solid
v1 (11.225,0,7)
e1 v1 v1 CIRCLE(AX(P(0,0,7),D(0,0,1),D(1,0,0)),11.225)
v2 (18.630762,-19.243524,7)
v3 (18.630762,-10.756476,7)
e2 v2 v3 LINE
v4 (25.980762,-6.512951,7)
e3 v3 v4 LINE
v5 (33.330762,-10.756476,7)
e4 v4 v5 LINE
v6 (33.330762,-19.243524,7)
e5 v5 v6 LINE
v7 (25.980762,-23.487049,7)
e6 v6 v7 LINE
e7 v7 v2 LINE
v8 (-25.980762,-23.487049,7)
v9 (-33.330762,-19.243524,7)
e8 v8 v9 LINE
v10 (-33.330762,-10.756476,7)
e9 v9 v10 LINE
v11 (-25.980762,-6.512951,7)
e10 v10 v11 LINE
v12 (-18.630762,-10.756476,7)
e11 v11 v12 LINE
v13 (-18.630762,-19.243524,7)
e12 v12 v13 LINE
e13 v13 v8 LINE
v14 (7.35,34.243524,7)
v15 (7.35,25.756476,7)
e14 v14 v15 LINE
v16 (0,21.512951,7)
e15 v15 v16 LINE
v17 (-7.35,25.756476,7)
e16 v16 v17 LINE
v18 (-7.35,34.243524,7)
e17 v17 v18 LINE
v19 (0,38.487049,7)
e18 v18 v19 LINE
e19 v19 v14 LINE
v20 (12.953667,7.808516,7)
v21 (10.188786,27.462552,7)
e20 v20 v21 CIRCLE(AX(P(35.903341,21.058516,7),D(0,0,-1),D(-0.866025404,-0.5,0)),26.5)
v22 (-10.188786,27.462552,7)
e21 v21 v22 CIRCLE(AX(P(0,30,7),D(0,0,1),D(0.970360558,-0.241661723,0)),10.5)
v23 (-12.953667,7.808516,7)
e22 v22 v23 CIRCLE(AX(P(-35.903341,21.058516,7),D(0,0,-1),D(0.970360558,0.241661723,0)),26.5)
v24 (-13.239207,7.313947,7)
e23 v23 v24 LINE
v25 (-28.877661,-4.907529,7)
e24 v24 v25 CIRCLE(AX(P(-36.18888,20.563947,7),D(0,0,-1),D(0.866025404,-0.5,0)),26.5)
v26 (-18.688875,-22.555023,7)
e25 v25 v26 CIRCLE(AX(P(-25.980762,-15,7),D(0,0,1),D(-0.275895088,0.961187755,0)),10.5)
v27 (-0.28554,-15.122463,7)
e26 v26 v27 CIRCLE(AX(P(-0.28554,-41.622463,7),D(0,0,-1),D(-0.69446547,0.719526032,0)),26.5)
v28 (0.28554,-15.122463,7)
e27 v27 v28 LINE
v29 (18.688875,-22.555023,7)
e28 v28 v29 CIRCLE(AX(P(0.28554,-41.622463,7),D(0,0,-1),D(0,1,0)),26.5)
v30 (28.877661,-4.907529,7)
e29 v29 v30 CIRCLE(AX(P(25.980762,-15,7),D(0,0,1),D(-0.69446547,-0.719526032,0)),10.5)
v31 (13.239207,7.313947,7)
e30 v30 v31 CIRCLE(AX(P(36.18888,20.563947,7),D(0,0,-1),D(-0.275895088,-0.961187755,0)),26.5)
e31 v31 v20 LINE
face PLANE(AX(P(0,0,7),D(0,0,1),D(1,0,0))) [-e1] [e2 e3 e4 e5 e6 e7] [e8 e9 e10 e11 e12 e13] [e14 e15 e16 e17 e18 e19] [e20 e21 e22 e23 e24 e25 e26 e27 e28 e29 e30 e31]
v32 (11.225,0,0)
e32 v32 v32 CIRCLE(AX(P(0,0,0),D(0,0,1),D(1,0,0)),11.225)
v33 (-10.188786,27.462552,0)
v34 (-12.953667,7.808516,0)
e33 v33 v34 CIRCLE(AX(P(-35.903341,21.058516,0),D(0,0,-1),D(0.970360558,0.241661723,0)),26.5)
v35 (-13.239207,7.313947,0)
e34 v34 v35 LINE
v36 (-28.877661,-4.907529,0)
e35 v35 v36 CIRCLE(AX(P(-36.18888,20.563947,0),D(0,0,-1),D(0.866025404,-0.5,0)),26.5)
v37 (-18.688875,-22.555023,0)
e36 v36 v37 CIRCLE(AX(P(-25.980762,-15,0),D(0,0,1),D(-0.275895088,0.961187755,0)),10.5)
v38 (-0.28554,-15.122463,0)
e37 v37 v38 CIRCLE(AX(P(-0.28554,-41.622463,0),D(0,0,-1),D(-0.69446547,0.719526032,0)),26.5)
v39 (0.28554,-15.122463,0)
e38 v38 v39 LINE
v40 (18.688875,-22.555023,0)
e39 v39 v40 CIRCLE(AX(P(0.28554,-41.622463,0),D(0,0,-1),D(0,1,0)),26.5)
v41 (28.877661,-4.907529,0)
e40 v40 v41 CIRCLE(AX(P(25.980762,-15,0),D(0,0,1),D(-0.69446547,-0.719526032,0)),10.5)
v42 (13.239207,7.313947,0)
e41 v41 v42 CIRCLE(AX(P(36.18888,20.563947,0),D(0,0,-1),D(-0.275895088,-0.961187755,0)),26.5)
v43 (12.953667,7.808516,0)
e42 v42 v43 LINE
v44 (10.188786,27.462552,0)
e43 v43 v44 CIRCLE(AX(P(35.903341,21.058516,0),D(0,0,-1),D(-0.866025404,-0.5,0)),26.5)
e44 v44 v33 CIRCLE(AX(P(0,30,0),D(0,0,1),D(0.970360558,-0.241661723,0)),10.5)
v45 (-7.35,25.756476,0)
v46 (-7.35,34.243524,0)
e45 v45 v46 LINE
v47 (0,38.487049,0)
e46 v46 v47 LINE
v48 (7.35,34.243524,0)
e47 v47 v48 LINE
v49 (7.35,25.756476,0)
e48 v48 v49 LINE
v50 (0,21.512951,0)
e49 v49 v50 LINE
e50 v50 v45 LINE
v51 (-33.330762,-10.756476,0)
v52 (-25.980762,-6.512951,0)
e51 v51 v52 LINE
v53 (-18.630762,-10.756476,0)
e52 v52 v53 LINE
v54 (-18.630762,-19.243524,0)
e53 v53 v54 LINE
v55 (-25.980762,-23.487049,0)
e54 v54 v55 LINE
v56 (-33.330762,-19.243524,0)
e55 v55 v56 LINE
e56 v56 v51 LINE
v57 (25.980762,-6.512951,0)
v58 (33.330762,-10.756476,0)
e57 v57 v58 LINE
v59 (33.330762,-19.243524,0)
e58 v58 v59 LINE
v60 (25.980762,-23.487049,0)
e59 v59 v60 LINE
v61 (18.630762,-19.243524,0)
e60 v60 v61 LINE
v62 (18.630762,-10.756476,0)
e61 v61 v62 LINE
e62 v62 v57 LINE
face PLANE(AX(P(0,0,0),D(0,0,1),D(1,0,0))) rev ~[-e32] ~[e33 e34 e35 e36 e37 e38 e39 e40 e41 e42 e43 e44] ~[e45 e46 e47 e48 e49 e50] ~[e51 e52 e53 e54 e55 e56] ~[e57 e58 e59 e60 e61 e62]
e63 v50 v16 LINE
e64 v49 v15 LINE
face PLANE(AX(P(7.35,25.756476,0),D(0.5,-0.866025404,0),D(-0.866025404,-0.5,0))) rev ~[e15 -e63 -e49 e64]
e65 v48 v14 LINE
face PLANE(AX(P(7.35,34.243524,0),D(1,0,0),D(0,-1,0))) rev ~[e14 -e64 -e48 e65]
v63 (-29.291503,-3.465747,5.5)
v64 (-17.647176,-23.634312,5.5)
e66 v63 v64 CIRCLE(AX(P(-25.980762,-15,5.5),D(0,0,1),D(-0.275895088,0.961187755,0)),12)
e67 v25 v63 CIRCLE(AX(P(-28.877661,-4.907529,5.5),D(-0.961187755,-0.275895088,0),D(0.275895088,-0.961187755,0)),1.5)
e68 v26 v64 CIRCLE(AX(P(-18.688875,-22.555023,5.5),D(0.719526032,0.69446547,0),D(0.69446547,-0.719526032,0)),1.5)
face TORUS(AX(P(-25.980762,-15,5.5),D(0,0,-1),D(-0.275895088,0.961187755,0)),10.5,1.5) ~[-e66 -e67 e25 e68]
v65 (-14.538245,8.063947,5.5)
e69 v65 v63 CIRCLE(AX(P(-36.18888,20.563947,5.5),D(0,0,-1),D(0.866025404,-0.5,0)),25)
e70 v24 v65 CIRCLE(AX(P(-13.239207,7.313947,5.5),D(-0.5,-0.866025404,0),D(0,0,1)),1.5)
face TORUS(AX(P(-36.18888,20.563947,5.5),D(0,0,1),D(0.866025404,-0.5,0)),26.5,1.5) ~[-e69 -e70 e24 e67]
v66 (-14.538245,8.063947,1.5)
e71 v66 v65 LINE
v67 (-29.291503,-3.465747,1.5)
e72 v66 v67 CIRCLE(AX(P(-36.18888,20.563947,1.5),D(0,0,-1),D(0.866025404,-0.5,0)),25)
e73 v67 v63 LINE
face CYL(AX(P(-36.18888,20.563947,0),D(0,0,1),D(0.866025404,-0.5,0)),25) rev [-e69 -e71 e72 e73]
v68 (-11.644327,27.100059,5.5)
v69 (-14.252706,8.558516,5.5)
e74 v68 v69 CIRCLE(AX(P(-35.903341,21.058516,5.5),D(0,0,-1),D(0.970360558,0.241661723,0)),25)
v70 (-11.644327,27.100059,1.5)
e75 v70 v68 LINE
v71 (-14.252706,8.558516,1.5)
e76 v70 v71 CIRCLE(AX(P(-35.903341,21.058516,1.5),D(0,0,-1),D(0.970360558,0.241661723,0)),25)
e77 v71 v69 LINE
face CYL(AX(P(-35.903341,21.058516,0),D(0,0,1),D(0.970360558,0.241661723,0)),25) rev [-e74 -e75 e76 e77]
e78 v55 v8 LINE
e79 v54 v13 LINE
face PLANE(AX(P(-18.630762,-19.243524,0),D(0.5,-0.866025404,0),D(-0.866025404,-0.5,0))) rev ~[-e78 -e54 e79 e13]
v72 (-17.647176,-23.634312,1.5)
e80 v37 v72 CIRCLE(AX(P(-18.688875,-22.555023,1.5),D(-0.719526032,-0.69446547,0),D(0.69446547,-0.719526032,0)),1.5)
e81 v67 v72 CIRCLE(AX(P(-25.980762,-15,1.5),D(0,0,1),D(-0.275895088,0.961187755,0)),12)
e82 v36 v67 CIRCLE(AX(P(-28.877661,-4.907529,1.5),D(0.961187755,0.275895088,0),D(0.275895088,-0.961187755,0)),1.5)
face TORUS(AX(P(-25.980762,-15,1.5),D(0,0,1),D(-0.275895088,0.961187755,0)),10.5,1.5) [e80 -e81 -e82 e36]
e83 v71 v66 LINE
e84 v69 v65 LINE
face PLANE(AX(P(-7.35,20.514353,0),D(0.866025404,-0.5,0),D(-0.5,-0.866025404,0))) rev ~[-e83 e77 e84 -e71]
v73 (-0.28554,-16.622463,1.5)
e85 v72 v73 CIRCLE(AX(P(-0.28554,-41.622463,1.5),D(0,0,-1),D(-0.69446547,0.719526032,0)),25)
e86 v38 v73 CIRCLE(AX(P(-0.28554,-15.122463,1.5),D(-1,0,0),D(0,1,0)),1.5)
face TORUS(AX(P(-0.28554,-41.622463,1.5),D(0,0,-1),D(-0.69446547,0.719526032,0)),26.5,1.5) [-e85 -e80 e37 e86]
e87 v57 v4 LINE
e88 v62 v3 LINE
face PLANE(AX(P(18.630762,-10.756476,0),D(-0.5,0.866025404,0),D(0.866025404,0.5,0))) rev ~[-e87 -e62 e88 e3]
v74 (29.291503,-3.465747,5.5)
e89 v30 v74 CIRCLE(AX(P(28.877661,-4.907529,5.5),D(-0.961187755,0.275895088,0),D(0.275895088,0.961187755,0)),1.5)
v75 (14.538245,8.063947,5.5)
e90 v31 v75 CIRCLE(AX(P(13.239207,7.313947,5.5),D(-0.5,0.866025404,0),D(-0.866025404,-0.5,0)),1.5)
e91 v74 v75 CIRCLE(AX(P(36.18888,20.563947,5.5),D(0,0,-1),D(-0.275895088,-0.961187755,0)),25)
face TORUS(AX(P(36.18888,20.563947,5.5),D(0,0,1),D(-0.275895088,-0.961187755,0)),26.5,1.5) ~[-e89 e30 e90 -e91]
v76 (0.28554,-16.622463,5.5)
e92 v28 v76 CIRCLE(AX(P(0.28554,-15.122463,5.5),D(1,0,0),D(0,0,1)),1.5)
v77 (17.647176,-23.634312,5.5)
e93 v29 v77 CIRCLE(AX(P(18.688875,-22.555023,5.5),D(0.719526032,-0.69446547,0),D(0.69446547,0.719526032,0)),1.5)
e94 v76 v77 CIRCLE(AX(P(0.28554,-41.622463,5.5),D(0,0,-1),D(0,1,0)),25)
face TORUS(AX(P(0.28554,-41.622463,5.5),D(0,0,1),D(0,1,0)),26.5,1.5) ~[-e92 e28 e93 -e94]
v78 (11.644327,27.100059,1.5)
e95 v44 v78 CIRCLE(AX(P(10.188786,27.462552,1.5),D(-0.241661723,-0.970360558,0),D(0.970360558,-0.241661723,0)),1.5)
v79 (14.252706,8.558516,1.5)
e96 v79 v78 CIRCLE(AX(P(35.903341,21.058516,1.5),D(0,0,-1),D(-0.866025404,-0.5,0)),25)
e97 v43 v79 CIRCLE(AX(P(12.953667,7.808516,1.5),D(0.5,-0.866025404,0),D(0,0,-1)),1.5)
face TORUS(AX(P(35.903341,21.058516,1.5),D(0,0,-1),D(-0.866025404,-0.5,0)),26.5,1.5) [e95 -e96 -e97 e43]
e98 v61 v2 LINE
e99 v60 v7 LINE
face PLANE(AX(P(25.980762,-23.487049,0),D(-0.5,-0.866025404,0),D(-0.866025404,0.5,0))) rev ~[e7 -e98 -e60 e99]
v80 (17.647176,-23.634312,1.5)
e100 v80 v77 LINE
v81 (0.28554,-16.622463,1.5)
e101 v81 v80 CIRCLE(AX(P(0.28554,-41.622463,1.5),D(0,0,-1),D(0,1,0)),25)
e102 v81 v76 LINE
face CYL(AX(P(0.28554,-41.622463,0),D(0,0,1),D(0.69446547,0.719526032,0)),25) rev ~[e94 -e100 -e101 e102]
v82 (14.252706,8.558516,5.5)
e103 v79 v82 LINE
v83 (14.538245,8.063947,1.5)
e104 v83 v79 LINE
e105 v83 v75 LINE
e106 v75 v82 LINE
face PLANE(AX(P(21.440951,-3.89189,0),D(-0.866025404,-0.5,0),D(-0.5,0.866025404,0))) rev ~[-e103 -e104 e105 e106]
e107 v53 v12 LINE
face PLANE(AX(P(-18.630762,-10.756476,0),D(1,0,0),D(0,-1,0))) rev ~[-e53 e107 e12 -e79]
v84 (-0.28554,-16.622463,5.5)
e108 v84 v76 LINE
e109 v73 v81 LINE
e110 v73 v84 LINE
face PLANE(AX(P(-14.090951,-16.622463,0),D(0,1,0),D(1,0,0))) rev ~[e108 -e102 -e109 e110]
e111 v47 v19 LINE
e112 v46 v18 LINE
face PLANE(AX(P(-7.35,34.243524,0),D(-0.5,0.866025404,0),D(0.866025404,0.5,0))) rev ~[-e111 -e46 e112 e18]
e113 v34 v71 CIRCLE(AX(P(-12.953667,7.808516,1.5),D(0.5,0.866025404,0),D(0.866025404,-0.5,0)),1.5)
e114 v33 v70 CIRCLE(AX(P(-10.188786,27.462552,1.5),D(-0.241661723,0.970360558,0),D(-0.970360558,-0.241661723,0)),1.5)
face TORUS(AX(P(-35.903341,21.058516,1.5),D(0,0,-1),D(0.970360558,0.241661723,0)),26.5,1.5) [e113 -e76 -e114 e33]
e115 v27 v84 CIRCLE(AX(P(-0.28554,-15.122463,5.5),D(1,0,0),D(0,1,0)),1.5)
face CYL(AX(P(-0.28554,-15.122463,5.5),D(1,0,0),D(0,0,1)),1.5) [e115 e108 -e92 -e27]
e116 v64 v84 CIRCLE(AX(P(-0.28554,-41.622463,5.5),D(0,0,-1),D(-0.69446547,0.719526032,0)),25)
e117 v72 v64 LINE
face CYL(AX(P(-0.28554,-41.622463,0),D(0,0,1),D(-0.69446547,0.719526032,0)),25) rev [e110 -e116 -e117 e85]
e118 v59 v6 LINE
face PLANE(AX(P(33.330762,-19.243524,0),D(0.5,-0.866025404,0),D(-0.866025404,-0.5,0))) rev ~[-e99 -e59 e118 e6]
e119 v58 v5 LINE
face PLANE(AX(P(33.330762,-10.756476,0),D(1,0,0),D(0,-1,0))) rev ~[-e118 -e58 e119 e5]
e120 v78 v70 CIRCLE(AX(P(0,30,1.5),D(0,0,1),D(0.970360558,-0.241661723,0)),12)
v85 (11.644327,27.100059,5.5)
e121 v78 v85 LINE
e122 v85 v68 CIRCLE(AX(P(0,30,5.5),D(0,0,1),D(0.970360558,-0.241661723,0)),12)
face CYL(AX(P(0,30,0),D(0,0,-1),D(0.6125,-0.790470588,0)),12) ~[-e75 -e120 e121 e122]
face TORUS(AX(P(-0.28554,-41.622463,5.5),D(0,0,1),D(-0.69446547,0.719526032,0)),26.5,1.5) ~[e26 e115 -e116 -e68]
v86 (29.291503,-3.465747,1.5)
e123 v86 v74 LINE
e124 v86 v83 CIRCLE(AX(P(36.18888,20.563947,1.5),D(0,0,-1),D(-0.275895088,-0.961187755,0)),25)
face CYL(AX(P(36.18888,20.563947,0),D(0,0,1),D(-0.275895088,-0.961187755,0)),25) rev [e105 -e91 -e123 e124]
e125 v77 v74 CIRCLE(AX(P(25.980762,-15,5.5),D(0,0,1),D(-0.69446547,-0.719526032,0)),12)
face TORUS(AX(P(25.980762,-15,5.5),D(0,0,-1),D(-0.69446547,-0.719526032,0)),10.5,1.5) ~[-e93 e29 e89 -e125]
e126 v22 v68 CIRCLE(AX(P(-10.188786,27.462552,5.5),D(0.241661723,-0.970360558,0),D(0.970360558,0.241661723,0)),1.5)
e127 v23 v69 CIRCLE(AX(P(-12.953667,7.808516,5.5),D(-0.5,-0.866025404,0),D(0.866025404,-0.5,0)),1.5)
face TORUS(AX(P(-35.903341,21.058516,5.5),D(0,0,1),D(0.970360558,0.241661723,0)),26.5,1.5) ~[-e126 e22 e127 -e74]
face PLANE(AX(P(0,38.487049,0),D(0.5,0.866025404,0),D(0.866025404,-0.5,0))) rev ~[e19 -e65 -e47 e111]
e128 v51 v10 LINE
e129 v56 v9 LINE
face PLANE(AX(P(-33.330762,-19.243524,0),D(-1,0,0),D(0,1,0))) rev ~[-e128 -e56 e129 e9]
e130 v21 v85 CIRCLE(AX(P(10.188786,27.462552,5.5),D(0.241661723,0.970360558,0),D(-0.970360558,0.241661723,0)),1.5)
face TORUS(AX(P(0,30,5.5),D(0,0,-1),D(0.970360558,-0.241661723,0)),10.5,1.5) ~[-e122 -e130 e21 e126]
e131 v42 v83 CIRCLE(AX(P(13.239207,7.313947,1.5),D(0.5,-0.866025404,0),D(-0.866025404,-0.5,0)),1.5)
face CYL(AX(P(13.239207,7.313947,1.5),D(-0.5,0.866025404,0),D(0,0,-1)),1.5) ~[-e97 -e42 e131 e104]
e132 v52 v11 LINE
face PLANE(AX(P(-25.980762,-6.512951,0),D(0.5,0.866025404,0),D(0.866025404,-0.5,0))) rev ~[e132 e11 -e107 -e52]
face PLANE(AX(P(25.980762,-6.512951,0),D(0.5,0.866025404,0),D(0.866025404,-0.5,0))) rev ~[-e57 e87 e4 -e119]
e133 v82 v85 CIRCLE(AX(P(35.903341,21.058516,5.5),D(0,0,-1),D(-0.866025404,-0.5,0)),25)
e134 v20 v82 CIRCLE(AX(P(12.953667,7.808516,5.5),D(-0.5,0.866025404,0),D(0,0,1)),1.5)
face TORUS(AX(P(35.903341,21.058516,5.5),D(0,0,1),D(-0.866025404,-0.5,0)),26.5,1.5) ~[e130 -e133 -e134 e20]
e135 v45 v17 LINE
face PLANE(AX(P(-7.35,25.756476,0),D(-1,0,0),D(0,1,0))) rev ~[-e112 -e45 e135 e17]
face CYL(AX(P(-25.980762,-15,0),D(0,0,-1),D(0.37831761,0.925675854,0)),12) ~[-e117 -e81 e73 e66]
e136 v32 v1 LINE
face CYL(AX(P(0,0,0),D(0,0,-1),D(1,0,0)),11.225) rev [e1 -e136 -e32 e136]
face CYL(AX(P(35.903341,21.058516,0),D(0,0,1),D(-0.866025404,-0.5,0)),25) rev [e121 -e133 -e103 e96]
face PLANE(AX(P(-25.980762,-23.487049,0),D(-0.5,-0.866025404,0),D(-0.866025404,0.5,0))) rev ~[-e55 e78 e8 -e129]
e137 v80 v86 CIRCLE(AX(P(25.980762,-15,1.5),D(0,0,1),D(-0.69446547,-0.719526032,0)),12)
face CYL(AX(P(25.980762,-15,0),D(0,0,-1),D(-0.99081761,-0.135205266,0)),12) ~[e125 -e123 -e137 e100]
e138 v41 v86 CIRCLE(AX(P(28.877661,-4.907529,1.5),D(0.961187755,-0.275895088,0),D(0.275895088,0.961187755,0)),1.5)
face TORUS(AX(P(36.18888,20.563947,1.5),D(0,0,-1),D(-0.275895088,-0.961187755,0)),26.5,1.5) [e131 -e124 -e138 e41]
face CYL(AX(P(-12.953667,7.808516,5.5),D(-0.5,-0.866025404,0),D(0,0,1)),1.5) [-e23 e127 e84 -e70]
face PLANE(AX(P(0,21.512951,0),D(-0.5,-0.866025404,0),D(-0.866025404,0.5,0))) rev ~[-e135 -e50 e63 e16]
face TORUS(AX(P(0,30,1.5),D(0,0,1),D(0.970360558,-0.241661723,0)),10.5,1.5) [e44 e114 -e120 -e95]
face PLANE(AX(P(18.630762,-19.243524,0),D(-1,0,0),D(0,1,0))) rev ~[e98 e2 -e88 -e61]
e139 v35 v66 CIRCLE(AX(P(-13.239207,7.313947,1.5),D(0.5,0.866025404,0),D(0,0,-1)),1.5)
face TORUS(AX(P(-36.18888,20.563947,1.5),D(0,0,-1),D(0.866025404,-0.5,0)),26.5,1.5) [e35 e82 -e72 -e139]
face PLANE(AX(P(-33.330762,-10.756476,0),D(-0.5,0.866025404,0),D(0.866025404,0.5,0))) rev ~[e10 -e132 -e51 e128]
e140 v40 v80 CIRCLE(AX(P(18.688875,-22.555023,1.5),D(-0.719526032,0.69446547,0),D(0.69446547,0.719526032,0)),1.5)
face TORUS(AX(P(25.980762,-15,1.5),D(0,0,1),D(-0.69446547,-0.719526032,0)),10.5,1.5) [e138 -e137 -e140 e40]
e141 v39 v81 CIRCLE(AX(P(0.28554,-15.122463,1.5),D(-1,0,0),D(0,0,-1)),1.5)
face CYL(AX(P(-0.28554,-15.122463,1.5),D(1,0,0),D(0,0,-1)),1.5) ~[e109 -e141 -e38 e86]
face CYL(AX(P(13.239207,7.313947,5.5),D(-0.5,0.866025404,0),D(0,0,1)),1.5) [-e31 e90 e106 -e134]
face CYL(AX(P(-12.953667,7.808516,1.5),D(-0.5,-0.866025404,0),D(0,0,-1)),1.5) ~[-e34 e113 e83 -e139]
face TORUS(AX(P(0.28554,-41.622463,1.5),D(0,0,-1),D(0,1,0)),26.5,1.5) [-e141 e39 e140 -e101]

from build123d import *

# Parameters (mm, degrees)
F0_R     = 11.225
F1_DEPTH = 7
F2_R     = 25
F3_R     = 1.5


with BuildPart() as f1:
    # F0 (on Top) → F1 (new body)
    with BuildSketch(Plane.XY):
        with BuildLine():
            Line((-14.0909507949, -16.6224631917), (-8.8518149883, -13.5976467234))
            ThreePointArc((-8.8518149883, -13.5976467234), (0, -16.225), (8.8518149883, -13.5976467234))
            Line((8.8518149883, -13.5976467234), (14.0909507949, -16.6224631917))
            ThreePointArc((14.0909507949, -16.6224631917), (36.3730669589, -21), (21.4409507949, -3.8918897561))
            Line((21.4409507949, -3.8918897561), (16.2018149883, -0.8670732877))
            ThreePointArc((16.2018149883, -0.8670732877), (14.0512621764, 8.1125), (7.35, 14.4647200111))
            Line((7.35, 14.4647200111), (7.35, 20.5143529477))
            ThreePointArc((7.35, 20.5143529477), (0, 42), (-7.35, 20.5143529477))
            Line((-7.35, 20.5143529477), (-7.35, 14.4647200111))
            ThreePointArc((-7.35, 14.4647200111), (-14.0512621764, 8.1125), (-16.2018149883, -0.8670732877))
            Line((-16.2018149883, -0.8670732877), (-21.4409507949, -3.8918897561))
            ThreePointArc((-21.4409507949, -3.8918897561), (-36.3730669589, -21), (-14.0909507949, -16.6224631917))
        make_face()
        Polygon((-25.9807621135, -23.4870489571), (-33.3307621135, -19.2435244785), (-33.3307621135, -10.7564755215), (-25.9807621135, -6.5129510429), (-18.6307621135, -10.7564755215), (-18.6307621135, -19.2435244785), align=None, mode=Mode.SUBTRACT)
        Circle(F0_R, mode=Mode.SUBTRACT)
        Polygon((33.3307621135, -10.7564755215), (33.3307621135, -19.2435244785), (25.9807621135, -23.4870489571), (18.6307621135, -19.2435244785), (18.6307621135, -10.7564755215), (25.9807621135, -6.5129510429), align=None, mode=Mode.SUBTRACT)
        Polygon((0, 38.4870489571), (7.35, 34.2435244785), (7.35, 25.7564755215), (0, 21.5129510429), (-7.35, 25.7564755215), (-7.35, 34.2435244785), align=None, mode=Mode.SUBTRACT)
        with BuildLine():
            Line((-7.35, 20.5143529477), (-21.4409507949, -3.8918897561))
            Line((-21.4409507949, -3.8918897561), (-16.2018149883, -0.8670732877))
            ThreePointArc((-16.2018149883, -0.8670732877), (-14.0512621764, 8.1125), (-7.35, 14.4647200111))
            Line((-7.35, 14.4647200111), (-7.35, 20.5143529477))
        make_face()
        with BuildLine():
            Line((16.2018149883, -0.8670732877), (21.4409507949, -3.8918897561))
            Line((21.4409507949, -3.8918897561), (7.35, 20.5143529477))
            Line((7.35, 20.5143529477), (7.35, 14.4647200111))
            ThreePointArc((7.35, 14.4647200111), (14.0512621764, 8.1125), (16.2018149883, -0.8670732877))
        make_face()
        with BuildLine():
            ThreePointArc((8.8518149883, -13.5976467234), (0, -16.225), (-8.8518149883, -13.5976467234))
            Line((-8.8518149883, -13.5976467234), (-14.0909507949, -16.6224631917))
            Line((-14.0909507949, -16.6224631917), (14.0909507949, -16.6224631917))
            Line((14.0909507949, -16.6224631917), (8.8518149883, -13.5976467234))
        make_face()
    extrude(amount=F1_DEPTH)

    # F2
    f2_edges = [f1.edges().sort_by_distance(p)[0] for p in [
        (-21.440951, -3.89189, 3.5),
        (7.35, 20.514353, 3.5),
        (14.090951, -16.622463, 3.5),
        (21.440951, -3.89189, 3.5),
        (-7.35, 20.514353, 3.5),
        (-14.090951, -16.622463, 3.5),
    ]]
    fillet(f2_edges, radius=F2_R)

    # F3
    f3_edges = [f1.edges().sort_by_distance(p)[0] for p in [
        (-11.147106, 17.57587, 7),
        (-20.794703, 0.865742, 7),
        (-36.373067, -21, 7),
        (-9.647597, -18.441612, 7),
        (36.373067, -21, 7),
        (20.794703, 0.865742, 7),
        (11.147106, 17.57587, 7),
        (0, 42, 7),
        (0, 42, 0),
        (-11.147106, 17.57587, 0),
        (-20.794703, 0.865742, 0),
        (-36.373067, -21, 0),
        (-9.647597, -18.441612, 0),
        (9.647597, -18.441612, 0),
        (36.373067, -21, 0),
        (20.794703, 0.865742, 0),
        (0, -16.622463, 0),
        (14.395475, 8.311232, 0),
        (11.147106, 17.57587, 0),
        (-14.395475, 8.311232, 0),
        (9.647597, -18.441612, 7),
        (0, -16.622463, 7),
        (14.395475, 8.311232, 7),
        (-14.395475, 8.311232, 7),
    ]]
    fillet(f3_edges, radius=F3_R)


solid = f1.part
